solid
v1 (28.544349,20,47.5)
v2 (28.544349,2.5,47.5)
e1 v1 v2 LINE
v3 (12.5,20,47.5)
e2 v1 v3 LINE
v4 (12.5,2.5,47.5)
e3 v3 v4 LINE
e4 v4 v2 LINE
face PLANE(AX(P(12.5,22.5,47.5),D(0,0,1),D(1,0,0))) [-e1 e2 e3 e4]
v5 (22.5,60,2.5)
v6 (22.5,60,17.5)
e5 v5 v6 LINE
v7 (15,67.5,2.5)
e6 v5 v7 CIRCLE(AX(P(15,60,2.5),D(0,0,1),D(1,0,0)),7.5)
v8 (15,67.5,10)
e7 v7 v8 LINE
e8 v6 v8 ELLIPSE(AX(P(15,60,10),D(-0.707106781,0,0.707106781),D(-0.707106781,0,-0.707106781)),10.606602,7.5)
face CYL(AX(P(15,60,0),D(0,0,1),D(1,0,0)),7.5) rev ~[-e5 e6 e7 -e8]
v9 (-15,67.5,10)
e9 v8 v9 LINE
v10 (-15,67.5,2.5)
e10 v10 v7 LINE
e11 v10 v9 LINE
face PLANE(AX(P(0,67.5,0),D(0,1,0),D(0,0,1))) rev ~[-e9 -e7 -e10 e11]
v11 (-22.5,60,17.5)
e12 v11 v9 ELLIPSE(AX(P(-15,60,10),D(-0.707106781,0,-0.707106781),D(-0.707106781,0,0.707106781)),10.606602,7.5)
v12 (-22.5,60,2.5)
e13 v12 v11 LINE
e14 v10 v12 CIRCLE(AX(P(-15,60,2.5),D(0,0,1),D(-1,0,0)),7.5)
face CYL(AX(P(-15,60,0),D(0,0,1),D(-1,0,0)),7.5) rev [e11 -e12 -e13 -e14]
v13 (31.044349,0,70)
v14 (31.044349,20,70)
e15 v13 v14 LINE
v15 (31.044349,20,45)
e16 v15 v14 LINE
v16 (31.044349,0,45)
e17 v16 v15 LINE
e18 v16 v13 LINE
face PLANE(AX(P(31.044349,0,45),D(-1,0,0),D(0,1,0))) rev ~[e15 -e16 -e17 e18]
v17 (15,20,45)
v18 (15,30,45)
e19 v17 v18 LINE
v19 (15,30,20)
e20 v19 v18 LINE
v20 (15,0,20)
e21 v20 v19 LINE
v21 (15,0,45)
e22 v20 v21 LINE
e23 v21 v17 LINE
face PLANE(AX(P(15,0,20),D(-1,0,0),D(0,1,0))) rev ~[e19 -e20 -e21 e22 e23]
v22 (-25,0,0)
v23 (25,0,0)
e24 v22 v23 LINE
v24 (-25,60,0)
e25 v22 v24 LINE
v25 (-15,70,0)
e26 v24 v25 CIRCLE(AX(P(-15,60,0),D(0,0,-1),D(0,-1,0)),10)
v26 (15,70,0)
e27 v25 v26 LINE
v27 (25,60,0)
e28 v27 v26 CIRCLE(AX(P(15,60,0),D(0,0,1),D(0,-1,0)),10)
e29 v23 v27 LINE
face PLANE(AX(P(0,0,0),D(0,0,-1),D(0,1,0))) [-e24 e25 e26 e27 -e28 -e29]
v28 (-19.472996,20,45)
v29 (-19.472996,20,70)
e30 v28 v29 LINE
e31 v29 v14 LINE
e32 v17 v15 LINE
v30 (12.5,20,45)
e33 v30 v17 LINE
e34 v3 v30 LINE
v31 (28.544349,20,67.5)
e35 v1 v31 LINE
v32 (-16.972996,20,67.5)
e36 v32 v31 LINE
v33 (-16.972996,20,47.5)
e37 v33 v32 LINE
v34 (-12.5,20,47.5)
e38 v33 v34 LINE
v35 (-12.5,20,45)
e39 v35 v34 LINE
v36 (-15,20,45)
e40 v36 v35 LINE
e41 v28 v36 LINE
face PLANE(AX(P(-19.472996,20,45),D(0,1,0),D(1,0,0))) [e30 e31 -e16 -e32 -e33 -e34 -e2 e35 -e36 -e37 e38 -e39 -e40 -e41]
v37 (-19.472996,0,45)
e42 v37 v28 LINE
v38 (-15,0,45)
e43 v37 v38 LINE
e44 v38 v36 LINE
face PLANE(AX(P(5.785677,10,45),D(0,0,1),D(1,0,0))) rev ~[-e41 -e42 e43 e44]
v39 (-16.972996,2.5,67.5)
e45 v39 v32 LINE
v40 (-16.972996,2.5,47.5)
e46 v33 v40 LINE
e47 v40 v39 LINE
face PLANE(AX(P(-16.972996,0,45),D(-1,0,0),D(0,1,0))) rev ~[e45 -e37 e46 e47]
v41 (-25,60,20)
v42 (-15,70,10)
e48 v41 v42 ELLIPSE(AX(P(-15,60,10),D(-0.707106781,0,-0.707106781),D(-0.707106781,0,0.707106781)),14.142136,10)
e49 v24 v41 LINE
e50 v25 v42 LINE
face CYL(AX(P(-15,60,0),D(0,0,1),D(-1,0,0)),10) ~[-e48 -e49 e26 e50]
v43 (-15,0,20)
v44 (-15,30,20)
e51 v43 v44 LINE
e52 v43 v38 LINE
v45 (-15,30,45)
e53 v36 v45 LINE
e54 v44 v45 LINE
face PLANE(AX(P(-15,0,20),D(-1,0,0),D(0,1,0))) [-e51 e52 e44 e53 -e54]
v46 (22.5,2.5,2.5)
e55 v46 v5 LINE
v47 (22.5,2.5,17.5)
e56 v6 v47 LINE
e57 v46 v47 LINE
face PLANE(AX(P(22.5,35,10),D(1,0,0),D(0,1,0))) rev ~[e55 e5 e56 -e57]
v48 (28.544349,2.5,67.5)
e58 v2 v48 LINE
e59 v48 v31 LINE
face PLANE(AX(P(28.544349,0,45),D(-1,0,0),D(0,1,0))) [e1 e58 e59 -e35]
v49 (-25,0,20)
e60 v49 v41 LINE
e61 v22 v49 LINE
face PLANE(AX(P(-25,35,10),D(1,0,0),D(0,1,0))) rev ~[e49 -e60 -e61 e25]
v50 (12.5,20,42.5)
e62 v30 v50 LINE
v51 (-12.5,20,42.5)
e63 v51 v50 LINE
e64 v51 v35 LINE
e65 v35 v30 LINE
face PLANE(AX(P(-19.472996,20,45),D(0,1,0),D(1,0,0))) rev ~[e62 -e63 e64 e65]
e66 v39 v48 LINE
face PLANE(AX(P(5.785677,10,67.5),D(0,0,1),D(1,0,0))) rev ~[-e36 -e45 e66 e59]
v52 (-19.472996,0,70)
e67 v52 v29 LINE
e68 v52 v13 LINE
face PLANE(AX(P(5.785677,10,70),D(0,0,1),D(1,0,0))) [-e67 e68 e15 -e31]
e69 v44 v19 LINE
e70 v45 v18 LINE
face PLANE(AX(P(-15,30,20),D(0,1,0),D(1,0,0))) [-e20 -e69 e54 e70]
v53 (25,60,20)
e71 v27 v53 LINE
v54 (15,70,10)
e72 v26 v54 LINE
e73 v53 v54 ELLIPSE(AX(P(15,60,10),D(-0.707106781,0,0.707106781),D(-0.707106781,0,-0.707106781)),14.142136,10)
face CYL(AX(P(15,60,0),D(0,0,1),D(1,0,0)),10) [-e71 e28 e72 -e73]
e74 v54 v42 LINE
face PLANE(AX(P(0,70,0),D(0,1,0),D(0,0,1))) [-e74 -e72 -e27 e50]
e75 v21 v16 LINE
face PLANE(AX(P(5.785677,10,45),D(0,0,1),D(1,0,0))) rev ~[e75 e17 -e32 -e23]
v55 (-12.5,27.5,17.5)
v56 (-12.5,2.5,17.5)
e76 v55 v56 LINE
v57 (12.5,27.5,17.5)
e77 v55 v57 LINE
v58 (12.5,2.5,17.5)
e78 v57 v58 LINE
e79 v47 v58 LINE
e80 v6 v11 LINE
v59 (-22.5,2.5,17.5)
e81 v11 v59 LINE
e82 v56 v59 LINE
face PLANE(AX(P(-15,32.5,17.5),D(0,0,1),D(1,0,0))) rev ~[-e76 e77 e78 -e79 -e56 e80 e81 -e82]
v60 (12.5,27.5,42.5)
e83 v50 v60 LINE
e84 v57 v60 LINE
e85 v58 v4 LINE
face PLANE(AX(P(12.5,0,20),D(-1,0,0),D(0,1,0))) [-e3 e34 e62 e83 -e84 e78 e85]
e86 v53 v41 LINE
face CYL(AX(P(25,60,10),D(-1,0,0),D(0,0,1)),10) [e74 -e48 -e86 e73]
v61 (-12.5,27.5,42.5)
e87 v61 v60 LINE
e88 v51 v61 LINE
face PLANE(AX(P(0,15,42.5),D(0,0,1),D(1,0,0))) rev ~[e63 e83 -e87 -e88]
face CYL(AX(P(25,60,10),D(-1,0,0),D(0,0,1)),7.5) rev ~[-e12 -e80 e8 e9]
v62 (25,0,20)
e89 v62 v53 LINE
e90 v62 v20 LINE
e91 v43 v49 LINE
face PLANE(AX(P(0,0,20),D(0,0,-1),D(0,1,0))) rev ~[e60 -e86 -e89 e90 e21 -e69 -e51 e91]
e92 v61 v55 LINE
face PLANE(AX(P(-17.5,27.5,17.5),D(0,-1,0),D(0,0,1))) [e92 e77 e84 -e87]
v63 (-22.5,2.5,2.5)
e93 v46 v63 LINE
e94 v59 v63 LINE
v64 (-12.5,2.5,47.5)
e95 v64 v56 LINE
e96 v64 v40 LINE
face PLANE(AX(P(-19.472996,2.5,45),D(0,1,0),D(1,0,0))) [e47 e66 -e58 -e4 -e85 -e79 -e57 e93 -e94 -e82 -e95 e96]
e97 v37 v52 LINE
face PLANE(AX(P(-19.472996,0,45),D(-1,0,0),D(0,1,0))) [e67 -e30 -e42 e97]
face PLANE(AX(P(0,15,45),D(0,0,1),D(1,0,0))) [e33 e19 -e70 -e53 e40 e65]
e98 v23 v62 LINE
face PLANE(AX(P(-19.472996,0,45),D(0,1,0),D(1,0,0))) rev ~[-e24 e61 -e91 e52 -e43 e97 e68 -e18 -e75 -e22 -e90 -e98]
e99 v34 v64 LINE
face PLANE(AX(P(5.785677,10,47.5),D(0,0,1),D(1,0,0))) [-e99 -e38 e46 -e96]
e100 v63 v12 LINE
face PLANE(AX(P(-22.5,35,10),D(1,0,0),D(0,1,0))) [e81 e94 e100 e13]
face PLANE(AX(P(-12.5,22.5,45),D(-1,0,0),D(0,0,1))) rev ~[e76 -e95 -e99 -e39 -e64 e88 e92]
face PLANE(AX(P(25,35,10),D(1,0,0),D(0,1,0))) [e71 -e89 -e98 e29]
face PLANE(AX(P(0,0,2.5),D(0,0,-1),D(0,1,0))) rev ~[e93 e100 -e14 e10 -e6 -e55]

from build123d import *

# Parameters (mm, degrees)
F0_W        = 70
F0_H        = 20
F1_DEPTH    = 25
F2_W        = 30
F2_H        = 30
F3_DEPTH    = 25
F4_R        = 10
F5_W        = 50.5173448473
F5_H        = 20
F6_DEPTH    = 25
F7_T        = 2.5
F7_T3_DEPTH = 35
F7_T5_DEPTH = 35
F7_T7_DEPTH = 25


# Not quite as in the source:
# - a shell that OpenCascade refuses in one call is made with other operations: the cavity is built on its own and cut out


with BuildPart() as f1:
    # F0 (on Right) → F1 (new body, symmetric)
    with BuildSketch(Plane.YZ):
        with Locations((35, 10)):
            Rectangle(F0_W, F0_H)
    extrude(amount=F1_DEPTH, both=True)

    # F2 (on face) → F3 (join)
    with BuildSketch(Plane.XY.offset(20)):
        with Locations((0, 15)):
            Rectangle(F2_W, F2_H)
    extrude(amount=F3_DEPTH)

    # F4
    f4_edges = [f1.edges().sort_by_distance(p)[0] for p in [
        (-25, 70, 10),
        (0, 70, 20),
        (25, 70, 10),
    ]]
    fillet(f4_edges, radius=F4_R)

    # F5 (on face) → F6 (join)
    with BuildSketch(Plane.XY.offset(45)):
        with Locations((5.7856766507, 10)):
            Rectangle(F5_W, F5_H)
    extrude(amount=F6_DEPTH)

    # F7: shell of thickness 2.5, made by hand


with BuildPart() as f7_core1:
    # F7_t2: copy of F1
    add(f1.part)

    # the walls: a layer under each face that stays
    f7_faces = [f7_core1.faces().sort_by_distance(p)[0] for p in [
        (-16.6666666667, 50, 20),
        (25, 30, 10),
        (0, 67.0710678119, 17.0710678119),
        (3.0221745372, 0, 35),
        (-25, 30, 10),
        (15, 15, 32.5),
        (0, 30, 32.5),
        (-15, 15, 32.5),
        (22.0710678119, 67.0710678119, 10),
        (0, 35, 0),
        (0, 70, 5),
        (-22.0710678119, 67.0710678119, 10),
        (23.0221745372, 10, 45),
        (0, 25, 45),
        (-17.2364978865, 10, 45),
        (-19.472995773, 10, 57.5),
        (31.0443490744, 10, 57.5),
        (5.7856766507, 10, 70),
    ]]
    thicken(f7_faces, amount=-F7_T, mode=Mode.SUBTRACT)

    # F7_s4 → F7_t3 (cut)
    with BuildSketch(Plane.XZ.offset(-32.5)):
        Polygon((15.025, 20.025), (15, 17.5), (12.5, 17.5), (12.5, 20), align=None)
        Polygon((-15.025, 20.025), (-15, 17.5), (-12.5, 17.5), (-12.5, 20), align=None)
    extrude(amount=F7_T3_DEPTH, mode=Mode.SUBTRACT)

    # F7_s6 → F7_t5 (cut)
    with BuildSketch(Plane.YZ.offset(-17.5)):
        Polygon((30.025, 20.025), (30, 17.5), (27.5, 17.5), (27.5, 20), align=None)
    extrude(amount=F7_T5_DEPTH, mode=Mode.SUBTRACT)

    # F7_s8 → F7_t7 (cut)
    with BuildSketch(Plane.XZ.offset(-22.5)):
        Polygon((15.025, 44.975), (12.5, 45), (12.5, 47.5), (15, 47.5), align=None)
        Polygon((-15.025, 44.975), (-12.5, 45), (-12.5, 47.5), (-15, 47.5), align=None)
    extrude(amount=F7_T7_DEPTH, mode=Mode.SUBTRACT)


with BuildPart() as f1_1:
    add(f1.part)

    # what is left inside the walls is the cavity
    f7_cavity = [f7_core1.part.solids().sort_by_distance(p)[0] for p in [
        (-7.5, 35, 2.525),
    ]]
    add(f7_cavity, mode=Mode.SUBTRACT)


solid = f1_1.part
